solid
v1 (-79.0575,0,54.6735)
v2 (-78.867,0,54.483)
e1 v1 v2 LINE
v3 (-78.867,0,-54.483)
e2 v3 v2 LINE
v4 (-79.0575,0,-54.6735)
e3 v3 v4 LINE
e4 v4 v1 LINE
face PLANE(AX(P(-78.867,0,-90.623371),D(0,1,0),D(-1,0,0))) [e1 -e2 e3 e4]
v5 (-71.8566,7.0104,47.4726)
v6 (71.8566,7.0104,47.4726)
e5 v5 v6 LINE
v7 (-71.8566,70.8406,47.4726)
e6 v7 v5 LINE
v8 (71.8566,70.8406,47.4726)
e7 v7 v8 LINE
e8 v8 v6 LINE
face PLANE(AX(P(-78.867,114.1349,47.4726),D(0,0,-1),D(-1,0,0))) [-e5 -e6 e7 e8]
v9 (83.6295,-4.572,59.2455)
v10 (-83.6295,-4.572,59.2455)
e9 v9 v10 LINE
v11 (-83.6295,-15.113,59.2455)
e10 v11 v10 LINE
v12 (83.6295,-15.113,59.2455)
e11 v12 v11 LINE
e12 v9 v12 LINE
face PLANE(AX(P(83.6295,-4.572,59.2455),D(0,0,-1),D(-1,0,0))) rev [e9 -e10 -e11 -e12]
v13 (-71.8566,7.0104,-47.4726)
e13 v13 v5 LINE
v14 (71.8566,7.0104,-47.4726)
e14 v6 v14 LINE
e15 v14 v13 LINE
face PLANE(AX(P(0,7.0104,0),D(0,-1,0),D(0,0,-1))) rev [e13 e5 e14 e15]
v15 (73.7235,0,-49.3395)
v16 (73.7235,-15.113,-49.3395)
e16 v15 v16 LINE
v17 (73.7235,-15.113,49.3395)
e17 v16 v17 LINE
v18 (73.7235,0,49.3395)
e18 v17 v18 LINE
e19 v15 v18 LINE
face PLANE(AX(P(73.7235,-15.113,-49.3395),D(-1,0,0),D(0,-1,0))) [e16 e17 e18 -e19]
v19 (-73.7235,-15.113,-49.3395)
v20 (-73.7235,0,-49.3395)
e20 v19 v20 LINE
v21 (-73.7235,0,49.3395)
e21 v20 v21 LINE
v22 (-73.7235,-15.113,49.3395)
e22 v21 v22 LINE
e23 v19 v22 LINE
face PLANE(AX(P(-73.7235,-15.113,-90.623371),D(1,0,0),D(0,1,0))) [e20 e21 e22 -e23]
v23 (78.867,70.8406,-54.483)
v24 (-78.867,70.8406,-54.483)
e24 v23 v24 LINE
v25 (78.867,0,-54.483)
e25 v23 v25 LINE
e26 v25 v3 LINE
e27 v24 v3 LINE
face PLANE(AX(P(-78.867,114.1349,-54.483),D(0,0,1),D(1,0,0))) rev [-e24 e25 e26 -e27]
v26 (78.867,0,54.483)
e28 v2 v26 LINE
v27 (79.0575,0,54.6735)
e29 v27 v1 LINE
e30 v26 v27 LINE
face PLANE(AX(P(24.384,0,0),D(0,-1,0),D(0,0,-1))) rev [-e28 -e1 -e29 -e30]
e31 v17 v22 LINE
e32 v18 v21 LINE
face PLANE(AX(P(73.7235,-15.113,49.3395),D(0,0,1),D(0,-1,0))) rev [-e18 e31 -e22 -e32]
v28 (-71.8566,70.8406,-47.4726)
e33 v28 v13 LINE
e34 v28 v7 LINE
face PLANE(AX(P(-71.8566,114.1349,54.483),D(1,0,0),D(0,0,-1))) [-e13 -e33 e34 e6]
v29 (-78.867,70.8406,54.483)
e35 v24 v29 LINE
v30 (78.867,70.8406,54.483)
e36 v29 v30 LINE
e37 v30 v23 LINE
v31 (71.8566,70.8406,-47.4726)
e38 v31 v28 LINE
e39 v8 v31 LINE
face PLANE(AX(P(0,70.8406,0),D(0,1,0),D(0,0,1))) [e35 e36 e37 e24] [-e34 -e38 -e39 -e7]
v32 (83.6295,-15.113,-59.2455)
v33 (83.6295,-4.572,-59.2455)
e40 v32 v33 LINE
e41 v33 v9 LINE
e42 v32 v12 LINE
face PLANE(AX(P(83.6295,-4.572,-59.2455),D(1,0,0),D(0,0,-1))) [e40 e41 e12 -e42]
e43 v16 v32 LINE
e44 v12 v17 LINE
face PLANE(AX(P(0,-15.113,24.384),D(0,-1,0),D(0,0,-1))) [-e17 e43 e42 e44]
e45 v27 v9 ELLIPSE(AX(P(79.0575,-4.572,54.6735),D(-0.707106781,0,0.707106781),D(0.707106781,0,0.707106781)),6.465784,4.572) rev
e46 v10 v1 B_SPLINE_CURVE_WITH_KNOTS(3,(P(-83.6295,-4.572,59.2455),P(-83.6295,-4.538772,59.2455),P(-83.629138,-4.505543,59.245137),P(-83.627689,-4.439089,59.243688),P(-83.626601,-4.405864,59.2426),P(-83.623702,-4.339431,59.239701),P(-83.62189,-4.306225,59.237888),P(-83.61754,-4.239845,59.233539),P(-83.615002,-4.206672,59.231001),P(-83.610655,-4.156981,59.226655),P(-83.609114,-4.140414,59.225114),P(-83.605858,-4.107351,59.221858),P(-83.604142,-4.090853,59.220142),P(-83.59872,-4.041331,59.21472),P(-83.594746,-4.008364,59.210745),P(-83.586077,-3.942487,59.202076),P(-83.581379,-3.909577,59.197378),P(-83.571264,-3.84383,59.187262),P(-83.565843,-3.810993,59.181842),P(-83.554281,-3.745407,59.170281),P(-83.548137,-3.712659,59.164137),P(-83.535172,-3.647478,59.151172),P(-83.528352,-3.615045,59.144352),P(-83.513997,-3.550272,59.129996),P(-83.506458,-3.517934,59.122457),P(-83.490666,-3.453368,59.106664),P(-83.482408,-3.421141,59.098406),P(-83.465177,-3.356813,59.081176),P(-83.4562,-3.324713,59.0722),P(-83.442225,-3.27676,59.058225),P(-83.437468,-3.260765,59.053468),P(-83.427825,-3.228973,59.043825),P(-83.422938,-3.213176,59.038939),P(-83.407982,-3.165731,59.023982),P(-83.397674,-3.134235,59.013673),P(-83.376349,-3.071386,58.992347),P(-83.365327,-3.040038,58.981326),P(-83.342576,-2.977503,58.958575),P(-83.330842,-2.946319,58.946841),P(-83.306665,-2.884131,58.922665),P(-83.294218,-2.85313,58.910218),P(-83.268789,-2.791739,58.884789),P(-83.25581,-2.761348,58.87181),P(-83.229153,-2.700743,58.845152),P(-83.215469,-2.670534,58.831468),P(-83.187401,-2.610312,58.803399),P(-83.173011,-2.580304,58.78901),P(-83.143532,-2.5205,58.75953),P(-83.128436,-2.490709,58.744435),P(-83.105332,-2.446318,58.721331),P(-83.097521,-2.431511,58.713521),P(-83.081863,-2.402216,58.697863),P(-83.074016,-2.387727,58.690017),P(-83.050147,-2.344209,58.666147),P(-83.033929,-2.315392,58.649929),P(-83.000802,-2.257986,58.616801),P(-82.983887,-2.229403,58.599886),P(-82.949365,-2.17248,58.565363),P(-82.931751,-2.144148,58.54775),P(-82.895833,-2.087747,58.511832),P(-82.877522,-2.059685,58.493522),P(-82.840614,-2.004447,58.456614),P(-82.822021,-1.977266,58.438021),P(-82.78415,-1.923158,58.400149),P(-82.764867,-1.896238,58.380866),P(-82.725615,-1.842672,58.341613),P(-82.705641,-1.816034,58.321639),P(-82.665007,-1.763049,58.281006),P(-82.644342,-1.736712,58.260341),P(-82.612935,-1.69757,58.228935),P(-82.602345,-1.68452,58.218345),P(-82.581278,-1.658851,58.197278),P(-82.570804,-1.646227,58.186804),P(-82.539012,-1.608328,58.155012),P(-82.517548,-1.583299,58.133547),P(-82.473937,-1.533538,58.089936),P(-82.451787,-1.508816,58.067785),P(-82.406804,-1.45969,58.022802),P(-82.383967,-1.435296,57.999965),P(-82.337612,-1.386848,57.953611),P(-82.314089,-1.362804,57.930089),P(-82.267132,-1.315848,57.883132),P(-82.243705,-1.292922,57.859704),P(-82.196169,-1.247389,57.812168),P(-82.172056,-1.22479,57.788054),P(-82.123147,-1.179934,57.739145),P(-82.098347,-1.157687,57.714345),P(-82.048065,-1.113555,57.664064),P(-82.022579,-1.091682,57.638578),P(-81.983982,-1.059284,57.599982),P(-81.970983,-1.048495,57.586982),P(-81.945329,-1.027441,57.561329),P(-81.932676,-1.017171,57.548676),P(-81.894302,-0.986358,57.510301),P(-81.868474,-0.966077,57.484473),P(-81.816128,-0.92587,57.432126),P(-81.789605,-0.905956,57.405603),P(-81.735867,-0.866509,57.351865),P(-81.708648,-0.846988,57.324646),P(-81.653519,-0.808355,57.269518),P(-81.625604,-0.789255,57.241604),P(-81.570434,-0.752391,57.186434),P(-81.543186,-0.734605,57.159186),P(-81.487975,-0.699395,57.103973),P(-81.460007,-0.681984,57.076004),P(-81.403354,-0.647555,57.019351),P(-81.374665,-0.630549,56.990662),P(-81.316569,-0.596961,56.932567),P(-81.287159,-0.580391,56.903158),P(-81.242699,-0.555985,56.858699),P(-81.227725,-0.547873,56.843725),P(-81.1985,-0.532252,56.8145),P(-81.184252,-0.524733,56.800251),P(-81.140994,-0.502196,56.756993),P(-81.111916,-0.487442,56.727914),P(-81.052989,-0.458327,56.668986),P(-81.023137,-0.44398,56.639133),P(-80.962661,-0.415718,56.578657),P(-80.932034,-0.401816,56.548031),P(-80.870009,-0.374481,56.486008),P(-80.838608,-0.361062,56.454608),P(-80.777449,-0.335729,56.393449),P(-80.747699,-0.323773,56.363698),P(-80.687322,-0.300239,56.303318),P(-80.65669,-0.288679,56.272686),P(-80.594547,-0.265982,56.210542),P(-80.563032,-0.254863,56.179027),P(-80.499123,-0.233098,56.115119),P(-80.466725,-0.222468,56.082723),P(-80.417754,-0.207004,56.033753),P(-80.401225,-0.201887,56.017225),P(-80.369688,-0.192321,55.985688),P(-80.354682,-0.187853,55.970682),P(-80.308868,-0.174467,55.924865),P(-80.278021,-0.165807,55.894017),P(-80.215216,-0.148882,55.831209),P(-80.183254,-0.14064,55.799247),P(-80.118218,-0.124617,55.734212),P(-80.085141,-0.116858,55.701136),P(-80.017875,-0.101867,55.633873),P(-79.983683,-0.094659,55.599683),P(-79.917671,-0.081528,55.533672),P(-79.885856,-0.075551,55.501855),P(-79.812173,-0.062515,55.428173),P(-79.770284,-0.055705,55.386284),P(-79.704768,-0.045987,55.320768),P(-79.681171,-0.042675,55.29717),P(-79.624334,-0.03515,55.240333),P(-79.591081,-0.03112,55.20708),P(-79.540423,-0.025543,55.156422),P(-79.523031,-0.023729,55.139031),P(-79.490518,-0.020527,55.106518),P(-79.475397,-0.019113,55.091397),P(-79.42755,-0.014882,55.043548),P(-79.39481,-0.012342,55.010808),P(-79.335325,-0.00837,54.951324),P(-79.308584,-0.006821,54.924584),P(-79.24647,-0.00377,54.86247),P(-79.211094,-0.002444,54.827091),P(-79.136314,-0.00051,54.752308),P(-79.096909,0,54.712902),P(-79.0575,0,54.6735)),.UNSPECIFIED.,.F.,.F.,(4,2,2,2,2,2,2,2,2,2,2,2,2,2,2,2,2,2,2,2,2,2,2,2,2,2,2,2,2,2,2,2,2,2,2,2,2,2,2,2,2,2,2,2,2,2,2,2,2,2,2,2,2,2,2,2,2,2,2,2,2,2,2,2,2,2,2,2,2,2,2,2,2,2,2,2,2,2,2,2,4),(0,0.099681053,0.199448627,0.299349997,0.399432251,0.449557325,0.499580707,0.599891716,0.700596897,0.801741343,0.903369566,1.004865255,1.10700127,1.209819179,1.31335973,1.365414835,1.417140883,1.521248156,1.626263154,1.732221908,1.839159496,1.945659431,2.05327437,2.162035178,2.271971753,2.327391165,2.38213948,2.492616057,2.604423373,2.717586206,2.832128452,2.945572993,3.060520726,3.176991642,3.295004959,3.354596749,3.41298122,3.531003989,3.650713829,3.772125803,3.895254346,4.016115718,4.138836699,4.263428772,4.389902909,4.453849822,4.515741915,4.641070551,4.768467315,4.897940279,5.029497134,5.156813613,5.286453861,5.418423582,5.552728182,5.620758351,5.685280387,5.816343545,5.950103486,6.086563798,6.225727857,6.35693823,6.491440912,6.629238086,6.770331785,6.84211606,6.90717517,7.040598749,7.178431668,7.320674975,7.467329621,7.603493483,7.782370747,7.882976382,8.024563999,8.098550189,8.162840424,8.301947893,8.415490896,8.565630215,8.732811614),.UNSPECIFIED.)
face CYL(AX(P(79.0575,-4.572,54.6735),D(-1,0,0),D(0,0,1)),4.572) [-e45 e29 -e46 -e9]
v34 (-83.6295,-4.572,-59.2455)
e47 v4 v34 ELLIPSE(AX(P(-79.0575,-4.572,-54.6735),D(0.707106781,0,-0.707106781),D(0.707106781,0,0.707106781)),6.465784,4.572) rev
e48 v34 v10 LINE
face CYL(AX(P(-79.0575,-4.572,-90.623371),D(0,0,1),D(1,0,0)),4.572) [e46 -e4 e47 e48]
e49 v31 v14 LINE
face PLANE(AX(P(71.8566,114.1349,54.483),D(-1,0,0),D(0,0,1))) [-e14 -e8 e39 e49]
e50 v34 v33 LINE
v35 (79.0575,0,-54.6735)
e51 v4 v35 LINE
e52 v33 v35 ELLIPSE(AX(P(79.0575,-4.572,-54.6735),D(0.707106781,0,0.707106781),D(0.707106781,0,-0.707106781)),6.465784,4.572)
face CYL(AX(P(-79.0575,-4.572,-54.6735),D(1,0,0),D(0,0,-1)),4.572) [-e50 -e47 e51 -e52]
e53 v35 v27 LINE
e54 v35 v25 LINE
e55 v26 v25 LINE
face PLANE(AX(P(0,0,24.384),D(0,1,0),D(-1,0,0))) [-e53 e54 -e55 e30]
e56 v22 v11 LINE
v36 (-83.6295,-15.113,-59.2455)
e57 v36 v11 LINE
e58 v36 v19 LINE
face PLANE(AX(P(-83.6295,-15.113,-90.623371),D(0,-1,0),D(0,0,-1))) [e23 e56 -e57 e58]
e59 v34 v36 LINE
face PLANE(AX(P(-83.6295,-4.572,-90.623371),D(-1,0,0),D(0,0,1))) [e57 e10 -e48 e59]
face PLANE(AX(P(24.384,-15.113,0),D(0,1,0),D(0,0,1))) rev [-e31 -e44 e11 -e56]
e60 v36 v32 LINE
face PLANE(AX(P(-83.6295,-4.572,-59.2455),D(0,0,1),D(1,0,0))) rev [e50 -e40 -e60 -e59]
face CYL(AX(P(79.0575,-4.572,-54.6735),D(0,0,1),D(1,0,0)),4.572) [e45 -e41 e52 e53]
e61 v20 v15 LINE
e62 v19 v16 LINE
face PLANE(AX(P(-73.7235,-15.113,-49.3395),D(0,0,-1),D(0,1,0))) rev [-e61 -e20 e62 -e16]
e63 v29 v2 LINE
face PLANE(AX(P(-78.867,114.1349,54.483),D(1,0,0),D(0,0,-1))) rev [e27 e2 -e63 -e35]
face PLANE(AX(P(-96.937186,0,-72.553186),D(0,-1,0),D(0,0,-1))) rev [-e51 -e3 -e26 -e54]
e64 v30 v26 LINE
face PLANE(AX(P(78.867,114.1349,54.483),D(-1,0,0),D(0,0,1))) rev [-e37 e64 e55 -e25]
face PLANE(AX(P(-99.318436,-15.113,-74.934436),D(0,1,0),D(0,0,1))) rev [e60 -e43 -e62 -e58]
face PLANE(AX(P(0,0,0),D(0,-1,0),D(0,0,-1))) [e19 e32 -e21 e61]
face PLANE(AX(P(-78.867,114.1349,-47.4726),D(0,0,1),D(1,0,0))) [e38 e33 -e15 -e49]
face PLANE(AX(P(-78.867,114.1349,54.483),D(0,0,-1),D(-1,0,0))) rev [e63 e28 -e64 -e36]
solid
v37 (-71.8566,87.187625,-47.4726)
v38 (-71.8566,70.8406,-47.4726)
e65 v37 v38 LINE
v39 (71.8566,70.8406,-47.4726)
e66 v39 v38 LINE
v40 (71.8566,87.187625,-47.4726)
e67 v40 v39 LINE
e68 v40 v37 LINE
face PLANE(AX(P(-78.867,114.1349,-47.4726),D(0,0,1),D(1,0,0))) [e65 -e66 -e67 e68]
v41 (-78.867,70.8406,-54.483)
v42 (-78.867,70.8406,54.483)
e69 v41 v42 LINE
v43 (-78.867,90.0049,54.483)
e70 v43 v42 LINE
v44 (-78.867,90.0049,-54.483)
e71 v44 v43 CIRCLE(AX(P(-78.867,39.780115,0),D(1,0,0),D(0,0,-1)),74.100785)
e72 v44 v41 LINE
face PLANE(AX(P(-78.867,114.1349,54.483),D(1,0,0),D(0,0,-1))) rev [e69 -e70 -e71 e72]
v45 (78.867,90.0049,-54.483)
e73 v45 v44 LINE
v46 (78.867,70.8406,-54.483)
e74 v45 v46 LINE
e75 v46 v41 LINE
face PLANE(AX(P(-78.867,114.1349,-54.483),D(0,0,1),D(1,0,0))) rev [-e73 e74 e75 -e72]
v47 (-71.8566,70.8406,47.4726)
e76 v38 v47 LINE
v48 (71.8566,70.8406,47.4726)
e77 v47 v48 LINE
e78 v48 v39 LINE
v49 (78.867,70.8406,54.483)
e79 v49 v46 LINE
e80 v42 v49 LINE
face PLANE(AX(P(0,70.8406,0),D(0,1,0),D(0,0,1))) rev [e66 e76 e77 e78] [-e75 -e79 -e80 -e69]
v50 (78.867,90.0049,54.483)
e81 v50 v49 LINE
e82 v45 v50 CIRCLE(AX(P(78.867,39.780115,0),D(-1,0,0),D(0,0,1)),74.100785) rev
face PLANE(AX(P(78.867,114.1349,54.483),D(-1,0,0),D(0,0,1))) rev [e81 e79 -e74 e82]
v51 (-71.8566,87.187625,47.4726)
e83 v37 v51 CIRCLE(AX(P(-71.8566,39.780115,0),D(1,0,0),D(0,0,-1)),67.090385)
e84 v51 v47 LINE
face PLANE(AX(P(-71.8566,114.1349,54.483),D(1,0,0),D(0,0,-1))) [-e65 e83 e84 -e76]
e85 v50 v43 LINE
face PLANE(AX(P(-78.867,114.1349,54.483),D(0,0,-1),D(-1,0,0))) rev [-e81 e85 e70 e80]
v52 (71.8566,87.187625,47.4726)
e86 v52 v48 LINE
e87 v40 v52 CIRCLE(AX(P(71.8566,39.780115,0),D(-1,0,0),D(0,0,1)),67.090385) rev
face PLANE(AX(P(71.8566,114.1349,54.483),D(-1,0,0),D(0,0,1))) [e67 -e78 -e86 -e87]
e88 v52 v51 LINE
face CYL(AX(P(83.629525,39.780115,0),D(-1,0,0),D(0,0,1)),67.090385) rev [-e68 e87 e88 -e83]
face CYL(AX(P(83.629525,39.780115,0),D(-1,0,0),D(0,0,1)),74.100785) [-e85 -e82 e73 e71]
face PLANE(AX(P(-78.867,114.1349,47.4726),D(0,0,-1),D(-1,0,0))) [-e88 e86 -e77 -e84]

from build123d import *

# Parameters (mm, degrees)
SKETCH1_W           = 157.734
SKETCH1_H           = 108.966
BOSS_EXTRUDE1_DEPTH = 114.1349
CUT_EXTRUDE1_DEPTH  = 208.224316094
SHELL1_T            = -7.0104
SHELL2_T            = -7.0104


with BuildPart() as part:
    # Sketch1 → Boss-Extrude1 (new body)
    with BuildSketch(Plane(origin=(0, 0, 0), x_dir=(1, 0, 0), z_dir=(0, 1, 0))):
        Rectangle(SKETCH1_W, SKETCH1_H)
    extrude(amount=BOSS_EXTRUDE1_DEPTH)

    # Sweep1: sweep along a path in Sketch3
    with BuildLine(Plane.XZ) as sweep1_path:
        Line((78.867, -54.483), (78.867, 54.483))
        Line((78.867, 54.483), (-78.867, 54.483))
        Line((-78.867, 54.483), (-78.867, -54.483))
        Line((-78.867, -54.483), (78.867, -54.483))
    # Sketch2 → Sweep1 (sweep)
    with BuildSketch(Plane.XY.offset(54.483)):
        with BuildLine():
            Line((-78.867, 0), (-79.0575, 0))
            ThreePointArc((-79.0575, 0), (-82.290392204, -1.339107796), (-83.6295, -4.572))
            Line((-83.6295, -4.572), (-83.6295, -15.113))
            Line((-83.6295, -15.113), (-73.7235, -15.113))
            Line((-73.7235, -15.113), (-73.7235, 0))
            Line((-73.7235, 0), (-78.867, 0))
        make_face()
    sweep(path=sweep1_path.line, transition=Transition.RIGHT)

    # Sketch4 → Cut-Extrude1 (cut, through all)
    with BuildSketch(Plane.ZY.offset(78.867)):
        with BuildLine():
            Line((-54.483, 90.0049), (-54.483, 114.1349))
            Line((-54.483, 114.1349), (54.483, 114.1349))
            Line((54.483, 114.1349), (54.483, 90.0049))
            ThreePointArc((54.483, 90.0049), (0, 113.8809), (-54.483, 90.0049))
        make_face()
    extrude(amount=-CUT_EXTRUDE1_DEPTH, mode=Mode.SUBTRACT)


with BuildPart() as body_2:
    # Split1: the piece on the far side of the plane
    add(part.part)
    split(bisect_by=Plane.ZX.offset(70.8406), keep=Keep.BOTTOM)

    # Shell1
    shell1_openings = [body_2.faces().sort_by_distance(p)[0] for p in [
        (0, 70.8406, 0),
    ]]
    offset(amount=SHELL1_T, openings=shell1_openings, kind=Kind.INTERSECTION)


with BuildPart() as part_1:
    add(part.part)

    # Split1
    split(bisect_by=Plane.ZX.offset(70.8406), keep=Keep.TOP)

    # Shell2
    shell2_openings = [part_1.faces().sort_by_distance(p)[0] for p in [
        (0, 70.8406, 0),
    ]]
    offset(amount=SHELL2_T, openings=shell2_openings, kind=Kind.INTERSECTION)


solid = Compound([body_2.part, part_1.part])
